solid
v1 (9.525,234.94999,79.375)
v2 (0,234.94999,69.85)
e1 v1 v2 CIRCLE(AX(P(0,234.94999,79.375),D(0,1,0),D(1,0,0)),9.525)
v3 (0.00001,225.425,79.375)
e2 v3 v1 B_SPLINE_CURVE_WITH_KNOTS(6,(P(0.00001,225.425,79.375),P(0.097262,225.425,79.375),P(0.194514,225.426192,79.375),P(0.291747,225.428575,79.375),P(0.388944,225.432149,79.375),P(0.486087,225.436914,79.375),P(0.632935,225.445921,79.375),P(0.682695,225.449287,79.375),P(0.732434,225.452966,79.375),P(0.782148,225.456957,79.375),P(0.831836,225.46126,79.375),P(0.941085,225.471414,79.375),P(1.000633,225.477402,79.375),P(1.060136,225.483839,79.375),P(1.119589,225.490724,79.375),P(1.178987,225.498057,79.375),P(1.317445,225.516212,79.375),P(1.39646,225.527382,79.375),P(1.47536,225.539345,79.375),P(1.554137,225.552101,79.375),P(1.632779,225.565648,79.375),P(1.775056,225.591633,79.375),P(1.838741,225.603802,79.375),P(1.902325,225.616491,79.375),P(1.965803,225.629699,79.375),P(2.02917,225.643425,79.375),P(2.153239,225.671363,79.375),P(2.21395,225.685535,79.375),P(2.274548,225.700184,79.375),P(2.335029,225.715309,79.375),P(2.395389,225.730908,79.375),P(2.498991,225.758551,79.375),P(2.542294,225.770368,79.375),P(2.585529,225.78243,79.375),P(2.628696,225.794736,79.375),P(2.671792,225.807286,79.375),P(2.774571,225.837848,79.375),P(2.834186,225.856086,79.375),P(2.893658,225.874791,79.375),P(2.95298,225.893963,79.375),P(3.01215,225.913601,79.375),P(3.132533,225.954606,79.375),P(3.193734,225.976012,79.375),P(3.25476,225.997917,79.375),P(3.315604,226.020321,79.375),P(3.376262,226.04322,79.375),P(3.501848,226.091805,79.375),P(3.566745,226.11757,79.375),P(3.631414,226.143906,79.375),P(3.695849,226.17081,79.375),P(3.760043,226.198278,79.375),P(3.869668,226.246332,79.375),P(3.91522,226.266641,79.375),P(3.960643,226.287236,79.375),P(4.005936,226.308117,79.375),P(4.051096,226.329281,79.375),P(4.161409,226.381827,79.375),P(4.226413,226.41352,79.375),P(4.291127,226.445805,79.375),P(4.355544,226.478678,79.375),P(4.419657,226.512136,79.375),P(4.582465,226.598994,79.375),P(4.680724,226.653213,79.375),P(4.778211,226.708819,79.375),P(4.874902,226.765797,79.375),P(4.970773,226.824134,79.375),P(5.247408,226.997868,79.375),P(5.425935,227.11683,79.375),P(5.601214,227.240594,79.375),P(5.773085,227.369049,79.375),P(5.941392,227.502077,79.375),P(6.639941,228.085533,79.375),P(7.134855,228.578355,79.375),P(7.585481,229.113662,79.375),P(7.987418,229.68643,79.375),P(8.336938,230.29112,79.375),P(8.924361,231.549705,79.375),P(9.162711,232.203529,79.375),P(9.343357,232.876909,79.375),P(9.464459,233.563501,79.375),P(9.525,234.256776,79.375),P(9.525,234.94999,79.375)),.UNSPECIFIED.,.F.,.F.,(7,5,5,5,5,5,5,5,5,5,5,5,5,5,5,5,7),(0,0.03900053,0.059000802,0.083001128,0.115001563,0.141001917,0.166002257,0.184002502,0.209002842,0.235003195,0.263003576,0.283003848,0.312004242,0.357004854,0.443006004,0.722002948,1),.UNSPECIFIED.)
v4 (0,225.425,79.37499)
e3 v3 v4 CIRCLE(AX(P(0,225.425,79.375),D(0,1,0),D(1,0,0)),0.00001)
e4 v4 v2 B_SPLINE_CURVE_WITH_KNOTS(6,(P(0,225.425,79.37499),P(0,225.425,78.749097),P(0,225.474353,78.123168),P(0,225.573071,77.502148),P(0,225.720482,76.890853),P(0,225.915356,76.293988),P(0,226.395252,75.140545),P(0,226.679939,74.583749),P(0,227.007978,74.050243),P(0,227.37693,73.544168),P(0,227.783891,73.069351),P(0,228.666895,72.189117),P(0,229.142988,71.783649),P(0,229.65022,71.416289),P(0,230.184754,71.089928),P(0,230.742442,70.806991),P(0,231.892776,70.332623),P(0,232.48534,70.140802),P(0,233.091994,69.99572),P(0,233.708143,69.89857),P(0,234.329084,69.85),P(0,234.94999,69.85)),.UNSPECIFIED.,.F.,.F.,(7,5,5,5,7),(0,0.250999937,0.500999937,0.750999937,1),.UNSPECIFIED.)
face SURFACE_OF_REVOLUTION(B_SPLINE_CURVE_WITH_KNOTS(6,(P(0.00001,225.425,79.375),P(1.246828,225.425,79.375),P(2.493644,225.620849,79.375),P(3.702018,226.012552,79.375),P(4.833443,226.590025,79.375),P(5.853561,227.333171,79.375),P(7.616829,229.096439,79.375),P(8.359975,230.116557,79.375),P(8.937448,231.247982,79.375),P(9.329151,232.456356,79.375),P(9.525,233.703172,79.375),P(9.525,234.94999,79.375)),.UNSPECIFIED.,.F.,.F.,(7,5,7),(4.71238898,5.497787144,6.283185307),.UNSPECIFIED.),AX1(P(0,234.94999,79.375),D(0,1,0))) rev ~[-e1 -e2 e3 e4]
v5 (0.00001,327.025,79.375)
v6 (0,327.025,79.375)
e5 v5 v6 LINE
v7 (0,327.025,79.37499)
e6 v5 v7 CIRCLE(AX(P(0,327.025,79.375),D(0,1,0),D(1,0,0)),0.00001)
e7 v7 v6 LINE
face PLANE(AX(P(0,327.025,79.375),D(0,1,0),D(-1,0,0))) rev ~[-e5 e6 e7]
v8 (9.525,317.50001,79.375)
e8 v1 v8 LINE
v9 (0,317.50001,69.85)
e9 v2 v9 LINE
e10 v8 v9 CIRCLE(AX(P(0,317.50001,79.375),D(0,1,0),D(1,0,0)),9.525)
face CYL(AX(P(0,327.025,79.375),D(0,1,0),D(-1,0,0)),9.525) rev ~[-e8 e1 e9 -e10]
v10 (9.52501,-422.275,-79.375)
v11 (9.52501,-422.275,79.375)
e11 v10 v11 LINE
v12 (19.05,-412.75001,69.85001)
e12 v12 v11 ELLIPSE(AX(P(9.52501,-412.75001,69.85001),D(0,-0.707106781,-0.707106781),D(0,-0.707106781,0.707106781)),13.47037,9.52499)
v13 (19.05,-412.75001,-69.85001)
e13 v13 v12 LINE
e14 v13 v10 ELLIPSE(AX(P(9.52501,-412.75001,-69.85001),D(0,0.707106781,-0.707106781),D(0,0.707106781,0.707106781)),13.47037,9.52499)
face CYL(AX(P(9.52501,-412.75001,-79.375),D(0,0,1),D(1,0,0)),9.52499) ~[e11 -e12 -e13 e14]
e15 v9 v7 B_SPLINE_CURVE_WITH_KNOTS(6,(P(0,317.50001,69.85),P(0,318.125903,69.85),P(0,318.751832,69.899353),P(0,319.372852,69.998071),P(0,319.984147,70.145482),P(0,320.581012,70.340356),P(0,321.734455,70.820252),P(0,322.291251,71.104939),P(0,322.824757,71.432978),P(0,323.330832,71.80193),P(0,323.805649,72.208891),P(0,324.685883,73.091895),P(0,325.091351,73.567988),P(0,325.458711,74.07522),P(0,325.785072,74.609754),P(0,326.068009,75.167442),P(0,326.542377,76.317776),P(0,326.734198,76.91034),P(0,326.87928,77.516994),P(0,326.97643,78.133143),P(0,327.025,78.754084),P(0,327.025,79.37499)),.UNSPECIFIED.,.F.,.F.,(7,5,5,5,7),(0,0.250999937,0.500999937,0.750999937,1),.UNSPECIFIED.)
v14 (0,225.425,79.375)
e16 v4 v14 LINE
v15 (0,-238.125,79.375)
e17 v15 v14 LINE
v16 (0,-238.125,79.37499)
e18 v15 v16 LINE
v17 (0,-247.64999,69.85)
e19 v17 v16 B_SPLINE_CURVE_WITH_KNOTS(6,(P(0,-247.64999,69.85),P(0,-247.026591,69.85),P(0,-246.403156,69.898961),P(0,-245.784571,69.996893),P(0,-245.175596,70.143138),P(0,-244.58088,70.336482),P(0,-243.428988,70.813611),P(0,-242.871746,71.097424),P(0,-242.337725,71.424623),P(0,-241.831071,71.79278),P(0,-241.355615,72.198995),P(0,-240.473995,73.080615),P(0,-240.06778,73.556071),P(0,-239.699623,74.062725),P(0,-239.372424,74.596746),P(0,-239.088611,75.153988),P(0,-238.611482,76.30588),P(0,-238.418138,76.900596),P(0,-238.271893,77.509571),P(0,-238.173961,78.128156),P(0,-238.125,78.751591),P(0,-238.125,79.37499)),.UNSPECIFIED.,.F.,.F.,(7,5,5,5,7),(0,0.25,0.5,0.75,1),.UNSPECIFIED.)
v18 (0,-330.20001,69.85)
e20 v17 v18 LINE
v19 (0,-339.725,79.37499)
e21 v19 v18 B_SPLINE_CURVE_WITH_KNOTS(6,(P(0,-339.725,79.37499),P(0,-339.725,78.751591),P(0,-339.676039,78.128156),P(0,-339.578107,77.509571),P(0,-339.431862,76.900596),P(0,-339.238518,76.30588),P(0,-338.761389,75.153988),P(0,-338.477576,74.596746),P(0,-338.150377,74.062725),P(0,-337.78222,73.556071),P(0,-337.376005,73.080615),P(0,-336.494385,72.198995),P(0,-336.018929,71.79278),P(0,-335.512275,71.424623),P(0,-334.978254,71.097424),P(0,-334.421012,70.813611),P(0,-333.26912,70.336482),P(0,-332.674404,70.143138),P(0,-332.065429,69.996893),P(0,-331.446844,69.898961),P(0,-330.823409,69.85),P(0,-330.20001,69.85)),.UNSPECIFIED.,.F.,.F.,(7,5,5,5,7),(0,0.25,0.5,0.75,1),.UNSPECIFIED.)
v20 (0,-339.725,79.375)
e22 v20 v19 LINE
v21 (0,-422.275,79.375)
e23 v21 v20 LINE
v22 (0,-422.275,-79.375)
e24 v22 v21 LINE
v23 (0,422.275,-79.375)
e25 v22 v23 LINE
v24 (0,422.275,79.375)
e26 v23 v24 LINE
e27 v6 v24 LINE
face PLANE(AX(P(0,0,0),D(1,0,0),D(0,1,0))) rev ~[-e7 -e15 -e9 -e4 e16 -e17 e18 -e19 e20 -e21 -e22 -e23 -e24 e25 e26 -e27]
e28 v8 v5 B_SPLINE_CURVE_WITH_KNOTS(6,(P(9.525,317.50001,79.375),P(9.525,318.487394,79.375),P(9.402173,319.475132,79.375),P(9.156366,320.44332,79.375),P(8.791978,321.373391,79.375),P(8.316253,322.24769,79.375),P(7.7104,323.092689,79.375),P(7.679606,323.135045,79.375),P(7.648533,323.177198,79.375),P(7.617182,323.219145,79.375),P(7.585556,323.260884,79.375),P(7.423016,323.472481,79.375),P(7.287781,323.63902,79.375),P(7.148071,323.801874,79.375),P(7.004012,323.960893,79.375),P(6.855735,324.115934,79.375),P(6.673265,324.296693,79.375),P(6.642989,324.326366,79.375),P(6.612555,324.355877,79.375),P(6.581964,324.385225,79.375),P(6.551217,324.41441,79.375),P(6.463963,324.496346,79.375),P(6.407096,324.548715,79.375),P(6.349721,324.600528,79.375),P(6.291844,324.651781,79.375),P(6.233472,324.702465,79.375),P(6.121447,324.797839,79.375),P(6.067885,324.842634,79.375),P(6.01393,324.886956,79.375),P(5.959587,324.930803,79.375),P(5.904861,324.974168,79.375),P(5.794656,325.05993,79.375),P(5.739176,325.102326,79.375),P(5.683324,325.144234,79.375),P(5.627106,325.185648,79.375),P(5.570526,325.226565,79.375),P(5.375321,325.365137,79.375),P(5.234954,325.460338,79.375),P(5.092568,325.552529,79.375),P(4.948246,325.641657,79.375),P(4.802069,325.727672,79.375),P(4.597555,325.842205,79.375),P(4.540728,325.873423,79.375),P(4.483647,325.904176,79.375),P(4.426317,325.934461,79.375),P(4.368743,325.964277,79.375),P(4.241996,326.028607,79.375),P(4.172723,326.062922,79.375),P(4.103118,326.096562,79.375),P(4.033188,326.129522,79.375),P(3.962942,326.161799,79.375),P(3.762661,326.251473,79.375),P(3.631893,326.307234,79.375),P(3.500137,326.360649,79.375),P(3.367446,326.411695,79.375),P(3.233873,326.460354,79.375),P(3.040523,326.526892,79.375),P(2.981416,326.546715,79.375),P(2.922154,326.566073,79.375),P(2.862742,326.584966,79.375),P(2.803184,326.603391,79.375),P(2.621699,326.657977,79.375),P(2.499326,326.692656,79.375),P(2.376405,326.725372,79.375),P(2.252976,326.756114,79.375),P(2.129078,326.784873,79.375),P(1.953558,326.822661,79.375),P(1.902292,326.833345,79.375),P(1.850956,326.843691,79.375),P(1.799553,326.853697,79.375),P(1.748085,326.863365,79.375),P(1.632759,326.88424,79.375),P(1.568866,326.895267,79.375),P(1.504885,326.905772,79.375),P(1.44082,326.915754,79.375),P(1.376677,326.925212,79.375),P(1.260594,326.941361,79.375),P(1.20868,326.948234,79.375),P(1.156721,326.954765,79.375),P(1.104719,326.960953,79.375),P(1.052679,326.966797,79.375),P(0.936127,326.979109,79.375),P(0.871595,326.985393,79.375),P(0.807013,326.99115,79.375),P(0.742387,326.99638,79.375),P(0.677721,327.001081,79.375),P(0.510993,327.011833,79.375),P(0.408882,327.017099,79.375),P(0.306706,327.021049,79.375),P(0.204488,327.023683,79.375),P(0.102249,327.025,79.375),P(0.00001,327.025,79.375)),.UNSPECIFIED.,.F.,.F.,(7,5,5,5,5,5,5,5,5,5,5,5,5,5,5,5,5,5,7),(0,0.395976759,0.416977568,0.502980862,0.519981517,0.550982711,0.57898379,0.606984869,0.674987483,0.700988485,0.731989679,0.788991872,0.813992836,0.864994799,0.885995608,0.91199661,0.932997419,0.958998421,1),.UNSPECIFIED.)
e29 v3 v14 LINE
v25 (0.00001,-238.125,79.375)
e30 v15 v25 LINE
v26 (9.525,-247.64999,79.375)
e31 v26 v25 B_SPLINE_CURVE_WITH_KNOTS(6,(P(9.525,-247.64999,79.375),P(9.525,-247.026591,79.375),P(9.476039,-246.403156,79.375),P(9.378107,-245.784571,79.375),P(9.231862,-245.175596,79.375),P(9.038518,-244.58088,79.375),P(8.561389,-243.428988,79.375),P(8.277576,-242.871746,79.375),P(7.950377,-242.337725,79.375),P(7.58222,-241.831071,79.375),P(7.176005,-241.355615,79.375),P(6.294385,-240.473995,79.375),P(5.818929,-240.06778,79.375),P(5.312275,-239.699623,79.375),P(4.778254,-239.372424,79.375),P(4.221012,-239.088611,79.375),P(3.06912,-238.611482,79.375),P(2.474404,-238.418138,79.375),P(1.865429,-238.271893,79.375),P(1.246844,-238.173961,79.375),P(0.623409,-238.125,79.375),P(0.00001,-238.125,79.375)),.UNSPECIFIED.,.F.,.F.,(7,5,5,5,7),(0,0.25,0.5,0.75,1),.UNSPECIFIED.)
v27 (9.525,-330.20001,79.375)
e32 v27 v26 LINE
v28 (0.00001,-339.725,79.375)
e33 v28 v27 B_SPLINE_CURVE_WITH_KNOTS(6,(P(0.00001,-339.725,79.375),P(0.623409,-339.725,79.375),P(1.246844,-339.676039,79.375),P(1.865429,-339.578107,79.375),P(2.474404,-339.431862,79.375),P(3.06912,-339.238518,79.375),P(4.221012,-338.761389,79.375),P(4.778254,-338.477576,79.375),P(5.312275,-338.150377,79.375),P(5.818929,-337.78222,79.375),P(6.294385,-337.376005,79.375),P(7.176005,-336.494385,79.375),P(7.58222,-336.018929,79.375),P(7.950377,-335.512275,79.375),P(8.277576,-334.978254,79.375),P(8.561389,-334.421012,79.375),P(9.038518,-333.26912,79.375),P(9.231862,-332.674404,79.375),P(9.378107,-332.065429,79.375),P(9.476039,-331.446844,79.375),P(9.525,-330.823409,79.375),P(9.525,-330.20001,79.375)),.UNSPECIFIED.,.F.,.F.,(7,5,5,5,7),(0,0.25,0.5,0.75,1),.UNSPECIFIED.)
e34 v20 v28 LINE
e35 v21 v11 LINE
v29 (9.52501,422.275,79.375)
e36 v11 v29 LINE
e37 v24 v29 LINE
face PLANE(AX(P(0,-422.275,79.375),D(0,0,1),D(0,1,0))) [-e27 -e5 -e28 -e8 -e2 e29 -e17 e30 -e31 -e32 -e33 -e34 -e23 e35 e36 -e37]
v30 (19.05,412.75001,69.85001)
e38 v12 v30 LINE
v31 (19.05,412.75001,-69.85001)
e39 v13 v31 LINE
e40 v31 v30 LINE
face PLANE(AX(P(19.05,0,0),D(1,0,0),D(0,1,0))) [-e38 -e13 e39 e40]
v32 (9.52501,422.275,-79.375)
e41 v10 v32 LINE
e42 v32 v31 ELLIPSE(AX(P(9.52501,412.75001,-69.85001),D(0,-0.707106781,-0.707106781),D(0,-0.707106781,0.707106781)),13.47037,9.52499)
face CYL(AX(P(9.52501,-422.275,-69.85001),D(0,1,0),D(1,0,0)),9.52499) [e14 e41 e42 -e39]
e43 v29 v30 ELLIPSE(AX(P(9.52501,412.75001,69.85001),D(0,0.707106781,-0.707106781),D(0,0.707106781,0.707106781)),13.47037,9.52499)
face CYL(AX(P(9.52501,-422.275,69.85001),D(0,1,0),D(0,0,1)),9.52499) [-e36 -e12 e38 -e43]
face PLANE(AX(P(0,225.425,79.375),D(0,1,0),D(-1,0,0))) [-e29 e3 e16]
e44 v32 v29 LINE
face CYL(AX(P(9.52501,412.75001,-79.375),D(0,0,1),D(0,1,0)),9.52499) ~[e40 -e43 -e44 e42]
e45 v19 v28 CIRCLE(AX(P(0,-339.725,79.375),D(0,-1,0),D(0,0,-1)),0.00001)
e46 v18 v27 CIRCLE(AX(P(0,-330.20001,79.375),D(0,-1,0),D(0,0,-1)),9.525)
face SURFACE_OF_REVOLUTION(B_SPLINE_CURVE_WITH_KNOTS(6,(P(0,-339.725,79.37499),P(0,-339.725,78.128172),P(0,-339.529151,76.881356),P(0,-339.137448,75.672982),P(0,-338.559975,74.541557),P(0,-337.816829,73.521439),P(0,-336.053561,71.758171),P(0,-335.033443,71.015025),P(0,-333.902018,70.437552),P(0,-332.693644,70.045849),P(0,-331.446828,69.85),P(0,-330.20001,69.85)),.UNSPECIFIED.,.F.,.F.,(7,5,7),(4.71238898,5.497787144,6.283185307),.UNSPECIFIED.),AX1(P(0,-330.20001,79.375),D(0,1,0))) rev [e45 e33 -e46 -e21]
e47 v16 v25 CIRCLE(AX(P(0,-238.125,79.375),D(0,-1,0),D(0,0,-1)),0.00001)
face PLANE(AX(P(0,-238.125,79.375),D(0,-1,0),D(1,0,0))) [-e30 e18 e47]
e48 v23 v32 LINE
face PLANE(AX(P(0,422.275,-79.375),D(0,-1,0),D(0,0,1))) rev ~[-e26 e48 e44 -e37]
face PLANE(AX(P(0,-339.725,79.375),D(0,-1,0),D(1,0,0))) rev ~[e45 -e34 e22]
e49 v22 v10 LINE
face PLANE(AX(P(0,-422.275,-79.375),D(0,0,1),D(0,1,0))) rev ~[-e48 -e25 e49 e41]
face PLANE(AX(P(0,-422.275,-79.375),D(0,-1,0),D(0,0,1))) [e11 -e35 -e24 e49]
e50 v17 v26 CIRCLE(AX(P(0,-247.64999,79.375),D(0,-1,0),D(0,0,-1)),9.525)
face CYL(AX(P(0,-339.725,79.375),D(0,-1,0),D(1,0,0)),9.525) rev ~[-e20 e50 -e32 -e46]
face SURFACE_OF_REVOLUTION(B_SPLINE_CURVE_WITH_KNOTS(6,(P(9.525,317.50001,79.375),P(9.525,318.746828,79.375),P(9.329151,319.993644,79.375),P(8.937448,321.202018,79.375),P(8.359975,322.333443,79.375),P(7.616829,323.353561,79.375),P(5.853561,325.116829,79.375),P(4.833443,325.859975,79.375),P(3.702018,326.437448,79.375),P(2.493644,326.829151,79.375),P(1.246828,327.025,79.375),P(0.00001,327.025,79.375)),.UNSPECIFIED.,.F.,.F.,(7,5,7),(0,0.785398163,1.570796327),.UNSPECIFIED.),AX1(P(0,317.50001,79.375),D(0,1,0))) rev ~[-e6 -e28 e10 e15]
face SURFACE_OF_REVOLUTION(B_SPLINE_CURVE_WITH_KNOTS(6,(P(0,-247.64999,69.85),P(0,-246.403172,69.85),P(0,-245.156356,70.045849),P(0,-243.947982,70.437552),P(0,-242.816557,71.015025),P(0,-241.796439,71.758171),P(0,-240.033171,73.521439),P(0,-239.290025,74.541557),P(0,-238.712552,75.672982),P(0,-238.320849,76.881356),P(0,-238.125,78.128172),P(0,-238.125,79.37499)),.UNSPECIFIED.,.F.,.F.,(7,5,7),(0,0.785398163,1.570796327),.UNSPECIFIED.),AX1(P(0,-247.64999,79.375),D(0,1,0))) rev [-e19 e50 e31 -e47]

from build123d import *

# Parameters (mm, degrees)
F0_W     = 844.55
F0_H     = 158.75
F1_DEPTH = 19.05
F3_R     = 9.525
F4_DEPTH = 101.6
F5_R     = 9.52499
F7_R     = 9.525
F8_DEPTH = 101.6
F9_R     = 9.52499
F10_R    = 9.52499


# Not quite as in the source:
# - a fillet or chamfer is up to 0.001 mm smaller than in the source, because OpenCascade refuses the exact size


with BuildPart() as f1:
    # F0 (on Right) → F1 (new body)
    with BuildSketch(Plane.YZ):
        Rectangle(F0_W, F0_H)
    extrude(amount=F1_DEPTH)

    # F3 (on offset) → F4 (cut)
    with BuildSketch(Plane.XZ.offset(339.725)):
        with Locations((0, 79.375)):
            Circle(F3_R)
    extrude(amount=-F4_DEPTH, mode=Mode.SUBTRACT)

    # F5 (radius 9.525 in the source; OpenCascade refuses exactly that, so slightly less here)
    f5_edges = [f1.edges().sort_by_distance(p)[0] for p in [
        (6.735192, -339.725, 72.639808),
        (6.735192, -238.125, 72.639808),
    ]]
    fillet(f5_edges, radius=F5_R)

    # F7 (on offset) → F8 (cut)
    with BuildSketch(Plane(origin=(0, 327.025, 0), x_dir=(-1, 0, 0), z_dir=(0, 1, 0))):
        with Locations((0, 79.375)):
            Circle(F7_R)
    extrude(amount=-F8_DEPTH, mode=Mode.SUBTRACT)

    # F9 (radius 9.525 in the source; OpenCascade refuses exactly that, so slightly less here)
    f9_edges = [f1.edges().sort_by_distance(p)[0] for p in [
        (6.735192, 225.425, 72.639808),
        (6.735192, 327.025, 72.639808),
    ]]
    fillet(f9_edges, radius=F9_R)

    # F10 (radius 9.525 in the source; OpenCascade refuses exactly that, so slightly less here)
    f10_edges = [f1.edges().sort_by_distance(p)[0] for p in [
        (19.05, -422.275, 0),
        (19.05, 0, 79.375),
        (19.05, 422.275, 0),
        (19.05, 0, -79.375),
    ]]
    fillet(f10_edges, radius=F10_R)


solid = f1.part
